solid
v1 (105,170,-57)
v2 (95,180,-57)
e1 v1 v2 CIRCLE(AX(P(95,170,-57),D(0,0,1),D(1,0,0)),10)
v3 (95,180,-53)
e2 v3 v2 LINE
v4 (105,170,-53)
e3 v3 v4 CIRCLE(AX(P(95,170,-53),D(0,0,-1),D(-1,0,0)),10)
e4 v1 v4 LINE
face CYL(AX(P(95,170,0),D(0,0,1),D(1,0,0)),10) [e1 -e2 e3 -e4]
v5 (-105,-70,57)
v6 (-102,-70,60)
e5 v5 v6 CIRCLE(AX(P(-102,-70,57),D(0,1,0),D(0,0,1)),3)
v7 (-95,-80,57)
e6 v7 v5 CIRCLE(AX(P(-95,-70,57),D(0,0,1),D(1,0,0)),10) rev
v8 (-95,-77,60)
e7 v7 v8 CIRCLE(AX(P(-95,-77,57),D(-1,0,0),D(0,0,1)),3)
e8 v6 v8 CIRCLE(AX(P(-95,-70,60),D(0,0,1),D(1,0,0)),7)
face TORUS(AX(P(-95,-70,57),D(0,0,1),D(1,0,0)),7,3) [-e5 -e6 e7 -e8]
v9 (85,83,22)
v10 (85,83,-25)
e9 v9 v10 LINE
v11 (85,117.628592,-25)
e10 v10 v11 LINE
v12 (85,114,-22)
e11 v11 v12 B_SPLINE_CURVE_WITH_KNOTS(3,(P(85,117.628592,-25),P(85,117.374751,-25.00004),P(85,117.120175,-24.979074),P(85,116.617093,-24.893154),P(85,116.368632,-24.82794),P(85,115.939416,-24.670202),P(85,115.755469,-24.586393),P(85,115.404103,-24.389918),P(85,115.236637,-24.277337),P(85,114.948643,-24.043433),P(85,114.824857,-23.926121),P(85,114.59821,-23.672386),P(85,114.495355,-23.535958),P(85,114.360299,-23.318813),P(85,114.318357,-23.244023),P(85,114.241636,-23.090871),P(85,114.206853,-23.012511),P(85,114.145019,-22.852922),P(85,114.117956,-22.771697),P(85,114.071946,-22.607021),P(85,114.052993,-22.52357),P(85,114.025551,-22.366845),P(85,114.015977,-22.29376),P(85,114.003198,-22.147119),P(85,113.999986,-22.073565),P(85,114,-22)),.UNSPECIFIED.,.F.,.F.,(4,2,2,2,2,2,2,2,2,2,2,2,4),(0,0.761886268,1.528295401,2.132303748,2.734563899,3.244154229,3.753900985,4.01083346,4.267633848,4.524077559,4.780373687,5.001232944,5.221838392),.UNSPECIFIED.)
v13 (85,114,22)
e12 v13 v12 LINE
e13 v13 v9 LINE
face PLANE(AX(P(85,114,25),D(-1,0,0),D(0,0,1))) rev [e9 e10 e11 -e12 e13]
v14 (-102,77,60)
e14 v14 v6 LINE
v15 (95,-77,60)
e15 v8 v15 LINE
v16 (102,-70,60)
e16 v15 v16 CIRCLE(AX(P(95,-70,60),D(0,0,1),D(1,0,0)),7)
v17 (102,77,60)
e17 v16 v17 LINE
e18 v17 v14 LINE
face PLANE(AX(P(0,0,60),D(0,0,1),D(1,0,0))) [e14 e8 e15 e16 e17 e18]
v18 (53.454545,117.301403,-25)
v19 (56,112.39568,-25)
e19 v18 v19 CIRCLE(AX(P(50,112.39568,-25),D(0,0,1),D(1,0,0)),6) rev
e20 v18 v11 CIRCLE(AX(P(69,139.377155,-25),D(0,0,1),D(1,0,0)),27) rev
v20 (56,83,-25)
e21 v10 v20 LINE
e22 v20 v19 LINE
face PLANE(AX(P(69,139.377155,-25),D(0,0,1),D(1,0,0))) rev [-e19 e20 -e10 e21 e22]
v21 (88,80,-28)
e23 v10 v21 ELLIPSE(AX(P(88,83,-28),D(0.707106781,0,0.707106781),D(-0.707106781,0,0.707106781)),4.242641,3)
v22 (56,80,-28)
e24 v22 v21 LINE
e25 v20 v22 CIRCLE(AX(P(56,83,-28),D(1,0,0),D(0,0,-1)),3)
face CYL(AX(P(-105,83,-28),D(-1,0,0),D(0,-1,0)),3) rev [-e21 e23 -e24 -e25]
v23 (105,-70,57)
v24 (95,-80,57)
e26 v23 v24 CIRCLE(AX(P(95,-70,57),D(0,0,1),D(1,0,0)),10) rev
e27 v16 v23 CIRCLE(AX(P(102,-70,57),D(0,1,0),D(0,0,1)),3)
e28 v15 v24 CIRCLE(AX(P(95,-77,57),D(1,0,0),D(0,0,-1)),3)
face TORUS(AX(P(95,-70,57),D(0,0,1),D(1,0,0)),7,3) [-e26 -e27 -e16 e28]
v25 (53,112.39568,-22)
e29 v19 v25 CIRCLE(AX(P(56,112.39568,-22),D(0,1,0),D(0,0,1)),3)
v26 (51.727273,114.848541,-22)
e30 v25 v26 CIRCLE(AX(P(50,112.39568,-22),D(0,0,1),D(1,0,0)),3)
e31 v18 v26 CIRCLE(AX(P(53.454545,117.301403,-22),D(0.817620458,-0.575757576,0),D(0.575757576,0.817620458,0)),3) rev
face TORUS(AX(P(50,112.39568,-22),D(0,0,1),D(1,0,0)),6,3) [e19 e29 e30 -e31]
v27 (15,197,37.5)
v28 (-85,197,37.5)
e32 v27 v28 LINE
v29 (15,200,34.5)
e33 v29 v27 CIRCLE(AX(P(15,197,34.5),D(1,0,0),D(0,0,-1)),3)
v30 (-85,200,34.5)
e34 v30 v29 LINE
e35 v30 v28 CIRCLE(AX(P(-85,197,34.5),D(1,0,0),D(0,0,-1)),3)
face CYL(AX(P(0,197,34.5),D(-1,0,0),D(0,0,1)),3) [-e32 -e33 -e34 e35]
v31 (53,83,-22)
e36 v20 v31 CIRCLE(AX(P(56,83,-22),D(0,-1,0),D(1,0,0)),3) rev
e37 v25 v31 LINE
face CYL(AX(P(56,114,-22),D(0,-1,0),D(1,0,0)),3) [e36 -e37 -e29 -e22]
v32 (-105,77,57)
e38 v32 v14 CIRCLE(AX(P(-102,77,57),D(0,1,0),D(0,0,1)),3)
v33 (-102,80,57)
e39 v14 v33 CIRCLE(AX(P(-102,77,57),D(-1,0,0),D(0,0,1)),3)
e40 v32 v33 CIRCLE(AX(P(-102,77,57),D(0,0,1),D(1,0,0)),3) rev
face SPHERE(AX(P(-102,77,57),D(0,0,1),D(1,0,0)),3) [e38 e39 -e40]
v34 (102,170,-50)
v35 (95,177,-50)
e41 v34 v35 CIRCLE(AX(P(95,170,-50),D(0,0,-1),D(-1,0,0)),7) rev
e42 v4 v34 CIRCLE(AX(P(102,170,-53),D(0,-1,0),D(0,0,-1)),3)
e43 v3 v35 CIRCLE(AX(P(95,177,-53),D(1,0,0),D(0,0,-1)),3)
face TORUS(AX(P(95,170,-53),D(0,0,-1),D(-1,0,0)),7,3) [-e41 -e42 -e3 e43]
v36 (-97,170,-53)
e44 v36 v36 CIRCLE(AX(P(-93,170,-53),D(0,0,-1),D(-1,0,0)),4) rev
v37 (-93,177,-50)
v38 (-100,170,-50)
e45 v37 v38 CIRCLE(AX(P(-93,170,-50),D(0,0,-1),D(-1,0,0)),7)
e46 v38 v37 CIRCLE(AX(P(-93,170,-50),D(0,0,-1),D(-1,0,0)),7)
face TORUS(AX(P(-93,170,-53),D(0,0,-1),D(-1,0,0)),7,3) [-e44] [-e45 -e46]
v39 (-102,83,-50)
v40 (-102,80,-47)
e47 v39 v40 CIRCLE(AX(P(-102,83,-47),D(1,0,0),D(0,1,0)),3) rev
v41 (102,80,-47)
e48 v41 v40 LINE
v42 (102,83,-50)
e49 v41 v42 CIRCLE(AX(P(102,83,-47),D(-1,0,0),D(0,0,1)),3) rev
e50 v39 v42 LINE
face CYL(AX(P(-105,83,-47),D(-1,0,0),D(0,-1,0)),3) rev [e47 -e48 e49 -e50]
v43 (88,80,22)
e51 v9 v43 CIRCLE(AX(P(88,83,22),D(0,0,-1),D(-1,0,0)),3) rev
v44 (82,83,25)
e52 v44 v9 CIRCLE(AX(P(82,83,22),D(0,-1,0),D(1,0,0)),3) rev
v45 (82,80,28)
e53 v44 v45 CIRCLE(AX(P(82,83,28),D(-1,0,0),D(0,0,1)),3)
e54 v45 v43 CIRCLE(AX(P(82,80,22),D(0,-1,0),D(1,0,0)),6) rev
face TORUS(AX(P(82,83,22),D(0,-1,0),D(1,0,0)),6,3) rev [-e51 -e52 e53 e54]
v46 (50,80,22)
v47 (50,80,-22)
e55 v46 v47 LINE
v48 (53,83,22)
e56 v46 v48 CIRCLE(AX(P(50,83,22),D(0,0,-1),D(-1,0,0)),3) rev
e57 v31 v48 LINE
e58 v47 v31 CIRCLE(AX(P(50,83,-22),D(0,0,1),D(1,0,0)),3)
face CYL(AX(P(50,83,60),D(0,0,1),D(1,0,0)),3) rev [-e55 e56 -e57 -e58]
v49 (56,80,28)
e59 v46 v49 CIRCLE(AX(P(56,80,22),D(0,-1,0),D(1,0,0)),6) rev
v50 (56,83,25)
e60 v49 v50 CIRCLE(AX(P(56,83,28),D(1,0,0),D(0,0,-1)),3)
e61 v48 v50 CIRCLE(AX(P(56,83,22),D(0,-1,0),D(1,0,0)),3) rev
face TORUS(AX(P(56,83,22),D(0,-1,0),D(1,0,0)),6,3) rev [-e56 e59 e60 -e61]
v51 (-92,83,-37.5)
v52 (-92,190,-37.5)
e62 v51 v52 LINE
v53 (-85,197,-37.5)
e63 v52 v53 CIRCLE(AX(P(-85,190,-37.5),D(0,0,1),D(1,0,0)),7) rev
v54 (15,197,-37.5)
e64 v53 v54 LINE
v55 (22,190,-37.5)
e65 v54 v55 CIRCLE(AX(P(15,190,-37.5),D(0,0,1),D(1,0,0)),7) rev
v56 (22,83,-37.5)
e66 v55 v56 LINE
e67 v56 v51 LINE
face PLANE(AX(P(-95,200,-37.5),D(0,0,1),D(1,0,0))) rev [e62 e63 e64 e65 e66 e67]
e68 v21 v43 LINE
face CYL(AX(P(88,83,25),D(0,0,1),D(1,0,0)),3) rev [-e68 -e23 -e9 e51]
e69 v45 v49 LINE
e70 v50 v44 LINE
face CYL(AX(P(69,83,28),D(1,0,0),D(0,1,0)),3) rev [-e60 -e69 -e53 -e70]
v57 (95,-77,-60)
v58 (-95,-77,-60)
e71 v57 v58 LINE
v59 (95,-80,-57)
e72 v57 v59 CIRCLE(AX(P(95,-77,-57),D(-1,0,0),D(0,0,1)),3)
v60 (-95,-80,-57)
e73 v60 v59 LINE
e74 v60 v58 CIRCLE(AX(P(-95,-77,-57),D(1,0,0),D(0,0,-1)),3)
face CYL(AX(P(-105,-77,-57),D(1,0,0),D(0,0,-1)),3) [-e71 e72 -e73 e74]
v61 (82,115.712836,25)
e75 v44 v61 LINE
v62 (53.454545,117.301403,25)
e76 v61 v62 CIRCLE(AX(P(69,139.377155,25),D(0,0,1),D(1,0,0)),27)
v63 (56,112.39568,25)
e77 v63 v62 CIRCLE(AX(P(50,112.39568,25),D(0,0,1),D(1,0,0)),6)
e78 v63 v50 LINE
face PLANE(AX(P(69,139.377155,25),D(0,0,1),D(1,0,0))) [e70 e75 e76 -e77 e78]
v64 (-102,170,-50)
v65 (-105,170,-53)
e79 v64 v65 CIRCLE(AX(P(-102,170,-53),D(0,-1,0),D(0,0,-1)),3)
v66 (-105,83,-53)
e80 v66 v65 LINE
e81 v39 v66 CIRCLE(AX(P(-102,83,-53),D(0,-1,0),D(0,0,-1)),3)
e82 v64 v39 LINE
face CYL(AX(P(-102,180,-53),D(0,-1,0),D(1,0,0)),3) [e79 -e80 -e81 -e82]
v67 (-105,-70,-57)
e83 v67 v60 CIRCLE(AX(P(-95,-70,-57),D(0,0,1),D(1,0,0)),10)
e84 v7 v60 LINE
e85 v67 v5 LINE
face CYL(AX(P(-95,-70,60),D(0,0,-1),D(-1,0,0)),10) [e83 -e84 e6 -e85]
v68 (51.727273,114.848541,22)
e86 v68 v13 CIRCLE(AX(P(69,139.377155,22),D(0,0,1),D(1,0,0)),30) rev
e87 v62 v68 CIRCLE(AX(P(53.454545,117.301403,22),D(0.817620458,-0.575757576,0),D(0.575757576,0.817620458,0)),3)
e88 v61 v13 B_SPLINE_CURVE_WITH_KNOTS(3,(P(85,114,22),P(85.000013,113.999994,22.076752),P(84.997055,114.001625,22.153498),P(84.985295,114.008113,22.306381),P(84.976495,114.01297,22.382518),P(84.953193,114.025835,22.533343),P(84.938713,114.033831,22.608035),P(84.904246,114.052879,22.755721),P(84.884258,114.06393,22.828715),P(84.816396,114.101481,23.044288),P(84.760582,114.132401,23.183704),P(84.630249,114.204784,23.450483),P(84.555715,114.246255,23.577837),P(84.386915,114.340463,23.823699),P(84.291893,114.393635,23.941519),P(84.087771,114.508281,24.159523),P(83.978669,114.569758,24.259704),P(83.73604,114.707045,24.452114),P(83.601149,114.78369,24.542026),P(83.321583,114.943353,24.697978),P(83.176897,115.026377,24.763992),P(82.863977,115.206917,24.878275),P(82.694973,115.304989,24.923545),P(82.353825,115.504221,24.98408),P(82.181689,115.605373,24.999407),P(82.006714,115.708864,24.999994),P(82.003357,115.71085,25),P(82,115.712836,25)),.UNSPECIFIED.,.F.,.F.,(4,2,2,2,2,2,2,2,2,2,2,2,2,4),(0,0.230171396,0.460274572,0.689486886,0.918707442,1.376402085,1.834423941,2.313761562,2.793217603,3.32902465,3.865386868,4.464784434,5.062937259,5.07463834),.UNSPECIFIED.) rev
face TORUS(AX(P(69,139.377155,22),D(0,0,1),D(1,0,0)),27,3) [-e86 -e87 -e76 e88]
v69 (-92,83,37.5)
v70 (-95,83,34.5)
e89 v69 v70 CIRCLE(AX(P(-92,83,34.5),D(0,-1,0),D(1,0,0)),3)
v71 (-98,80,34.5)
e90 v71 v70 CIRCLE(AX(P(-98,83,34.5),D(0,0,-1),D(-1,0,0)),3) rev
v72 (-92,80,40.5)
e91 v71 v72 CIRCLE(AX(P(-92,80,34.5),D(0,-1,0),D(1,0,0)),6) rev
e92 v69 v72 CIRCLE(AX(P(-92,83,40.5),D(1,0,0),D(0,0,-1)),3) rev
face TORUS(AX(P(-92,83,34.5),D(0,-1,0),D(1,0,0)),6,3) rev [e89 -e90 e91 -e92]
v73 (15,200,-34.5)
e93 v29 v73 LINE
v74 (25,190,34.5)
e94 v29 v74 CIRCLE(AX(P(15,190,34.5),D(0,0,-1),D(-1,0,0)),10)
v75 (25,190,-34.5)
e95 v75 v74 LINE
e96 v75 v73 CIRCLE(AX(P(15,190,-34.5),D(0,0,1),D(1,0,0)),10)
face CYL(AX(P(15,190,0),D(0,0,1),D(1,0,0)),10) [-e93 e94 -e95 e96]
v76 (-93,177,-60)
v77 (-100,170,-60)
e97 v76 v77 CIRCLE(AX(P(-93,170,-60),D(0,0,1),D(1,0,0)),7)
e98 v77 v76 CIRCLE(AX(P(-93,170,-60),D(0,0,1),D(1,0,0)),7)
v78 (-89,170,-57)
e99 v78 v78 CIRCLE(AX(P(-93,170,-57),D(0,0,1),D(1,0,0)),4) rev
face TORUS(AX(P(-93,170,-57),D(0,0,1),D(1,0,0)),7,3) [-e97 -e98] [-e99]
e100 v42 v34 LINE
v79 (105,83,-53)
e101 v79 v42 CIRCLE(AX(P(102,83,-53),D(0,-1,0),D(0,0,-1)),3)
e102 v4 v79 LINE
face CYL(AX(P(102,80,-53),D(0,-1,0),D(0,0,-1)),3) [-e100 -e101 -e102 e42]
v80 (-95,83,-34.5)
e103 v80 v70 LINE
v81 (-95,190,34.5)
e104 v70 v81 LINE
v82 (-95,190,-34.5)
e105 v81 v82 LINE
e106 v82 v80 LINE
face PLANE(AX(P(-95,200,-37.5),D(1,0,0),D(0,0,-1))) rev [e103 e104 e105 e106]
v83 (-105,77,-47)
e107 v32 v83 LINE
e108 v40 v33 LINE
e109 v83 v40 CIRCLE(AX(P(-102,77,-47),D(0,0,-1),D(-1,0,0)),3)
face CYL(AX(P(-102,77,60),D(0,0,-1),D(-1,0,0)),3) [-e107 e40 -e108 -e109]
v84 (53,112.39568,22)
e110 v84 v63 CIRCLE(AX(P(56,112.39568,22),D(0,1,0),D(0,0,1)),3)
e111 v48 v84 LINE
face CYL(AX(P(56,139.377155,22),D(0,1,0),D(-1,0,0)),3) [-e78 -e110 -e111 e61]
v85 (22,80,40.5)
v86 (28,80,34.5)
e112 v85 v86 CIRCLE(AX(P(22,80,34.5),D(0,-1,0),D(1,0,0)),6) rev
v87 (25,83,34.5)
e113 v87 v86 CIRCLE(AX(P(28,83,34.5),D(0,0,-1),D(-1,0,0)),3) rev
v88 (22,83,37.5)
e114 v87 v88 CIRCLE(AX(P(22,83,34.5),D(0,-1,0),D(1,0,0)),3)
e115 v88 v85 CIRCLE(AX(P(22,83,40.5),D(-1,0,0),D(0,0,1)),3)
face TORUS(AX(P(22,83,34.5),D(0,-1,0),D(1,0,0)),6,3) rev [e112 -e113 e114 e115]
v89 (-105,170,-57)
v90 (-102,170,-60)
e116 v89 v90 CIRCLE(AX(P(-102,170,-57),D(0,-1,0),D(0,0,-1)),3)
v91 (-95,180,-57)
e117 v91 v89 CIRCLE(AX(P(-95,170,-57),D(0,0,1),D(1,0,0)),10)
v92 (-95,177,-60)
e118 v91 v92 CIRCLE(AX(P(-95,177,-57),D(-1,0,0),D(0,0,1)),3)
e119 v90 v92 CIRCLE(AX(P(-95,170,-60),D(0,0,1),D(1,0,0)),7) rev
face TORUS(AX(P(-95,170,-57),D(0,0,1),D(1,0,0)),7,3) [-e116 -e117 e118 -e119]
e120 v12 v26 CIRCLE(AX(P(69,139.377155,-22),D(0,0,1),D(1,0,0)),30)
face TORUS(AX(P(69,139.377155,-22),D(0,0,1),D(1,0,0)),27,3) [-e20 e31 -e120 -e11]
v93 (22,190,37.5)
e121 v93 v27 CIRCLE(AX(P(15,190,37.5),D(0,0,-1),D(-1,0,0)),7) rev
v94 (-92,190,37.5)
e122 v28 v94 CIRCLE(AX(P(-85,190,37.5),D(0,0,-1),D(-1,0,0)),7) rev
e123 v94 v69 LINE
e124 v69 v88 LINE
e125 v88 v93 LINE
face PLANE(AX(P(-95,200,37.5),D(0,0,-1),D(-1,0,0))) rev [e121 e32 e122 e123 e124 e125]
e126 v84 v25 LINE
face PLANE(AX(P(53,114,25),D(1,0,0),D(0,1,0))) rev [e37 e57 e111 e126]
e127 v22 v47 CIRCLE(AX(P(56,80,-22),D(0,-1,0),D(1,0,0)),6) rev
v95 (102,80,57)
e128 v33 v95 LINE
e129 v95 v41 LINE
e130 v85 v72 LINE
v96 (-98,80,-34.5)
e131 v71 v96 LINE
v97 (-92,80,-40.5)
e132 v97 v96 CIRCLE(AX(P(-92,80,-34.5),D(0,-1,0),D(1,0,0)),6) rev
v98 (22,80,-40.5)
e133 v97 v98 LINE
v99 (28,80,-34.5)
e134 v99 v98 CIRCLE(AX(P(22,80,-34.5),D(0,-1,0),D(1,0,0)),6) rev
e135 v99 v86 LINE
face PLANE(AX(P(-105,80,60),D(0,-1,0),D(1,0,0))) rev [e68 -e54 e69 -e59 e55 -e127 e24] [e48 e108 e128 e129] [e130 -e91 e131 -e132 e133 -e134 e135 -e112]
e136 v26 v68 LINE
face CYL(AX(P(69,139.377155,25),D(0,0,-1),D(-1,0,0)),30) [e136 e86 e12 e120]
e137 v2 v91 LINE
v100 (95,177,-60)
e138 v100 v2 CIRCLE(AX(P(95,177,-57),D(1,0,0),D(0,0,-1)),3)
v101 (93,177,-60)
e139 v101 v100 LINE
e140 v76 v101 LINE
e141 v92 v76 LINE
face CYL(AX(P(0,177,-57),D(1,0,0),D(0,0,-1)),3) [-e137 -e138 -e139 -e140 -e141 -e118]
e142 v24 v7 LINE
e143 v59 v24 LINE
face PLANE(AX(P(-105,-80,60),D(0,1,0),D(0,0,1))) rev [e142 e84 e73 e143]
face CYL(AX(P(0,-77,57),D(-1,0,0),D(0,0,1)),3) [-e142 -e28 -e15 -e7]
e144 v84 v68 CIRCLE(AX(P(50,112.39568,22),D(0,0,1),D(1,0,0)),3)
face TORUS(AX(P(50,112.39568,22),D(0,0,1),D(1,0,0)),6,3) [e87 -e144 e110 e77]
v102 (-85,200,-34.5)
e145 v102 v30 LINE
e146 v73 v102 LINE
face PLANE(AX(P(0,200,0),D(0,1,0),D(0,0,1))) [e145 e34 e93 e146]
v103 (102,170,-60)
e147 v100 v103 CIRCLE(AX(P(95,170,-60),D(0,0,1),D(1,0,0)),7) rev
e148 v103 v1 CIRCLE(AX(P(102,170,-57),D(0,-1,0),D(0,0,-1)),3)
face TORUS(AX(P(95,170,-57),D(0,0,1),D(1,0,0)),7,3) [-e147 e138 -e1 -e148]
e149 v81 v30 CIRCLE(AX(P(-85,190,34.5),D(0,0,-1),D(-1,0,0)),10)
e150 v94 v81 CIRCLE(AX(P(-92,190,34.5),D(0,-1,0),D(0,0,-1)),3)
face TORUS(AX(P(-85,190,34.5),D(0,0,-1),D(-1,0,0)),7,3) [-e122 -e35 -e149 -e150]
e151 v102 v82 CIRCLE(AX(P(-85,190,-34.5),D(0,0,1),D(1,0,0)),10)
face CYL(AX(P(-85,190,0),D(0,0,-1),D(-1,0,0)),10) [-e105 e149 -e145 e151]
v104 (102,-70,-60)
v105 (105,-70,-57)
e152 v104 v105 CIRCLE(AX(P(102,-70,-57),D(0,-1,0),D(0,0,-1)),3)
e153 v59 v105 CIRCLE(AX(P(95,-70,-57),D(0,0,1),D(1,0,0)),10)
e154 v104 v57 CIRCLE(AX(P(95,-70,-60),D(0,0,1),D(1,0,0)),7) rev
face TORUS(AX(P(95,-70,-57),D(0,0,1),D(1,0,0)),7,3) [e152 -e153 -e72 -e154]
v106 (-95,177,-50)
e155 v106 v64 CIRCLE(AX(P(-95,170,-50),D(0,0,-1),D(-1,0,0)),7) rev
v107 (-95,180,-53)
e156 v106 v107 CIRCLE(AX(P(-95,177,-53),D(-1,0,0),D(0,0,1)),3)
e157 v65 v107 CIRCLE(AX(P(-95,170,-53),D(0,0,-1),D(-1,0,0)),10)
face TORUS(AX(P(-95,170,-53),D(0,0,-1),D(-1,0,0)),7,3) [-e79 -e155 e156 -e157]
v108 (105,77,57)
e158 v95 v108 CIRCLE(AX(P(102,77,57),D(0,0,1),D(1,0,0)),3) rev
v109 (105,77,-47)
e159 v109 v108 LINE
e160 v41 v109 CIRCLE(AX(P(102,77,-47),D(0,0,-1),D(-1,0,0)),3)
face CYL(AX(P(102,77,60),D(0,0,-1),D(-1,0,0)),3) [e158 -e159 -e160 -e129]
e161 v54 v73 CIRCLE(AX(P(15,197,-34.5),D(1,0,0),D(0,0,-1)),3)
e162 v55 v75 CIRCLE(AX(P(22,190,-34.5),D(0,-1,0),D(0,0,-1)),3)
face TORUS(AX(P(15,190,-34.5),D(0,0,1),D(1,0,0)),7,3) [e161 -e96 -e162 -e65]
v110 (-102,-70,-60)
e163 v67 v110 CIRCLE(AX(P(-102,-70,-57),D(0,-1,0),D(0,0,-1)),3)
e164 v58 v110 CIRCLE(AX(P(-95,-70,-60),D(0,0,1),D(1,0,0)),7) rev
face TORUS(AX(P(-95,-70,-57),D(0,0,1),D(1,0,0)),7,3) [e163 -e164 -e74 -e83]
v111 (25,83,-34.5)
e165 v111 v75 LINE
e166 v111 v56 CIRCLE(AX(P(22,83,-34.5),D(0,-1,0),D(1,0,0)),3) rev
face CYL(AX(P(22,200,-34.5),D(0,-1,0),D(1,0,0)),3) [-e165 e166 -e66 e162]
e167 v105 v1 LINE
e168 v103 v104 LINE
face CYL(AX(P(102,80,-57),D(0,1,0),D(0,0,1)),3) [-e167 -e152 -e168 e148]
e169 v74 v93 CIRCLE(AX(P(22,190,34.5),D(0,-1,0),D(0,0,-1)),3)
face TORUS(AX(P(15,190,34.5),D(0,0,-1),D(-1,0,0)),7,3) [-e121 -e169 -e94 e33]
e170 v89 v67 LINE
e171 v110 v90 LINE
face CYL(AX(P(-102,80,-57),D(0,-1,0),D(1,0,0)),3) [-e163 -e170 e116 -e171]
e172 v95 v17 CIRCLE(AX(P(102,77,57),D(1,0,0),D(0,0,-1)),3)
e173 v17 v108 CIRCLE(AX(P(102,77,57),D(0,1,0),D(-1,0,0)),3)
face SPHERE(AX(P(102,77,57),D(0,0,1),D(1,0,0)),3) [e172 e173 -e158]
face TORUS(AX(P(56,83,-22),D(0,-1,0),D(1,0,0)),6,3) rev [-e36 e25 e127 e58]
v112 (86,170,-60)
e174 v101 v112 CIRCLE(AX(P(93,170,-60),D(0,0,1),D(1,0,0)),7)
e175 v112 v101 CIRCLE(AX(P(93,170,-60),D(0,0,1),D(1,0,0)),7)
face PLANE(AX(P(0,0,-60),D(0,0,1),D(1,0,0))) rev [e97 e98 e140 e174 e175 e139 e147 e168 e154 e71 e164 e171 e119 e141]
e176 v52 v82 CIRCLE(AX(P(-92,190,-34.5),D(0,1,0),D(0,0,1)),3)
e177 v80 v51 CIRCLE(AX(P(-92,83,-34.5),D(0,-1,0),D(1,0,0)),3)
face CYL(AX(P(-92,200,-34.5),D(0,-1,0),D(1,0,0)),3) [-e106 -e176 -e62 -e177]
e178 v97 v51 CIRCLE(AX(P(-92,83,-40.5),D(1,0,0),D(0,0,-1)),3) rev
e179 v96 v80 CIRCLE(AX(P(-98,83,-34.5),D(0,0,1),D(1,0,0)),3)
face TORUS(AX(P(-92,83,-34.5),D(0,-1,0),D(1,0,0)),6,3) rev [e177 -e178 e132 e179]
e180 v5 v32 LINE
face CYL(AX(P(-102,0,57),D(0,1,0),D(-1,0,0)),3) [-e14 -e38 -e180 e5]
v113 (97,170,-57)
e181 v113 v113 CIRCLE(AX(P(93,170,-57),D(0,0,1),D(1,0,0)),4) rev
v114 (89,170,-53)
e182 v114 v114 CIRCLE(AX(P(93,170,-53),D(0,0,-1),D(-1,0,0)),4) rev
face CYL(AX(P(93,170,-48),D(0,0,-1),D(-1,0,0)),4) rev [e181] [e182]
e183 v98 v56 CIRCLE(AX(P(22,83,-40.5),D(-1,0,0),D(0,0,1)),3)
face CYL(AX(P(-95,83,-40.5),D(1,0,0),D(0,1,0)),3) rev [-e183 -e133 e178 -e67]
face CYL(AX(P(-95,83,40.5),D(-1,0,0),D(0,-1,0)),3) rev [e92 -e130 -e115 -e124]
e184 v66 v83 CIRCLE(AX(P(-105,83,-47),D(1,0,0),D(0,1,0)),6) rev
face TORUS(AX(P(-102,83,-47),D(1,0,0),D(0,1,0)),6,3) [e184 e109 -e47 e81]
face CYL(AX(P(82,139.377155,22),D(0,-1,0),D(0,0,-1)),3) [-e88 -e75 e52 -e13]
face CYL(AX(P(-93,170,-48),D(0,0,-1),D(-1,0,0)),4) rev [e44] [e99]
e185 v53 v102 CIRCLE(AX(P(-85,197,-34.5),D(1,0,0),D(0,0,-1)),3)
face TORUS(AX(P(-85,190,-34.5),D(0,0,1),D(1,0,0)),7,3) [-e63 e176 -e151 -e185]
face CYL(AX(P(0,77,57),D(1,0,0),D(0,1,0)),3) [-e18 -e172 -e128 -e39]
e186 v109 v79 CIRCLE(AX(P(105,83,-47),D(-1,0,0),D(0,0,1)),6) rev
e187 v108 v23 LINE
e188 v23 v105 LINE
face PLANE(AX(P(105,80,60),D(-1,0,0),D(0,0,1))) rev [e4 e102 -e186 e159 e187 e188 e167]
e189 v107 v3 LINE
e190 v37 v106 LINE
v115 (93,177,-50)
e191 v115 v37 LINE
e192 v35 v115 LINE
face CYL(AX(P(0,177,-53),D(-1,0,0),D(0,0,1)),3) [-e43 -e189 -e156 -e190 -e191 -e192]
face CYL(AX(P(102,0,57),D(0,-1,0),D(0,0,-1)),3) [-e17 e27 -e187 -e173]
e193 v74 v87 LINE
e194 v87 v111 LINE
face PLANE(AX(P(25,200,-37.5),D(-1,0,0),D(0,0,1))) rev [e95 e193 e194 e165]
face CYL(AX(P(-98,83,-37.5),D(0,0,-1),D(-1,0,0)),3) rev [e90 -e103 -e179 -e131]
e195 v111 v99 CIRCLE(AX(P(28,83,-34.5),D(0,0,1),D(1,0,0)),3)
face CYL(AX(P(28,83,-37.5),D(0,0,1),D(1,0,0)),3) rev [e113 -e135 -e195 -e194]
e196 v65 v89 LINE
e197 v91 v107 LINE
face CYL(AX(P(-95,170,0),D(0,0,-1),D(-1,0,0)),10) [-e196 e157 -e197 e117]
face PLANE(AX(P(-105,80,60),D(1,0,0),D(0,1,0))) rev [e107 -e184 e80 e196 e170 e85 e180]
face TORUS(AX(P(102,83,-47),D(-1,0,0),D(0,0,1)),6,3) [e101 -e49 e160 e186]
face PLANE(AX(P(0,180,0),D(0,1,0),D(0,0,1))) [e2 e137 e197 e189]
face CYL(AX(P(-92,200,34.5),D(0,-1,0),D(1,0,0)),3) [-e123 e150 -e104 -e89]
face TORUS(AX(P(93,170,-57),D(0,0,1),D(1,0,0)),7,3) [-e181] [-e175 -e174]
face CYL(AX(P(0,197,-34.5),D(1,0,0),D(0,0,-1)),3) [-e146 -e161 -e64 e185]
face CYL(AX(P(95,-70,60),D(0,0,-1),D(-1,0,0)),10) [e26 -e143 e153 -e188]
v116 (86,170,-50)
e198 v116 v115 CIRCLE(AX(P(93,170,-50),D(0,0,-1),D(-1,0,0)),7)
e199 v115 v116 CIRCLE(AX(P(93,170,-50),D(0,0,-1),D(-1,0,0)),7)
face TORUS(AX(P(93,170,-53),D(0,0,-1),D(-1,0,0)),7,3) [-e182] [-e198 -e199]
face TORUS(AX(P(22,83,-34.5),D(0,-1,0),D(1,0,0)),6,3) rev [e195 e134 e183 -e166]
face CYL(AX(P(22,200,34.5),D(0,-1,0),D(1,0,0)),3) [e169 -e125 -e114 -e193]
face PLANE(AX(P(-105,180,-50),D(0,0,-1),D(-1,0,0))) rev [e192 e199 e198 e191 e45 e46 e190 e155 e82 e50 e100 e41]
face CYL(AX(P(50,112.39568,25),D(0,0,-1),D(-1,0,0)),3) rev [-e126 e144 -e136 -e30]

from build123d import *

# Parameters (mm, degrees)
SKETCH_1_W          = 210
SKETCH_1_H          = 160
EXTRUDE_1_DEPTH     = 60
SKETCH_2_W          = 120
SKETCH_2_H          = 75
EXTRUDE_2_DEPTH     = 120
EXTRUDE_3_DEPTH     = 25
SKETCH_4_W          = 210
SKETCH_4_H          = 10
EXTRUDE_4_DEPTH     = 100
SKETCH_5_R          = 4
CUT_EXTRUDE_1_DEPTH = 12
FILLET_1_R          = 10
FILLET_4_R          = 3


with BuildPart() as part:
    # 草图1 → 凸台-拉伸1 (new, symmetric)
    with BuildSketch(Plane.XY):
        Rectangle(SKETCH_1_W, SKETCH_1_H)
    extrude(amount=EXTRUDE_1_DEPTH, both=True)

    # 草图2 → 凸台-拉伸2 (add)
    with BuildSketch(Plane(origin=(0, 80, 0), x_dir=(1, 0, 0), z_dir=(0, 1, 0))):
        with Locations((-35, 0)):
            Rectangle(SKETCH_2_W, SKETCH_2_H)
    extrude(amount=EXTRUDE_2_DEPTH)

    # 草图3 → 凸台-拉伸3 (add, symmetric)
    with BuildSketch(Plane.XY):
        with BuildLine():
            Line((53, 114), (53, 80))
            Line((53, 80), (85, 80))
            Line((85, 80), (85, 114))
            ThreePointArc((85, 114), (69, 169.377155081), (53, 114))
        make_face()
    extrude(amount=EXTRUDE_3_DEPTH, both=True)

    # 草图4 → 凸台-拉伸4 (add)
    with BuildSketch(Plane(origin=(0, 80, 0), x_dir=(1, 0, 0), z_dir=(0, 1, 0))):
        with Locations((0, 55)):
            Rectangle(SKETCH_4_W, SKETCH_4_H)
    extrude(amount=EXTRUDE_4_DEPTH)

    # 草图5 → 切除-拉伸1 (cut)
    with BuildSketch(Plane(origin=(0, 0, -60), x_dir=(-1, 0, 0), z_dir=(0, 0, -1))):
        with Locations((-93, 170)):
            Circle(SKETCH_5_R)
        with Locations((93, 170)):
            Circle(SKETCH_5_R)
    extrude(amount=-CUT_EXTRUDE_1_DEPTH, mode=Mode.SUBTRACT)

    # 圆角1
    fillet_1_edges = [part.edges().sort_by_distance(p)[0] for p in [
        (25, 200, 0),
        (-95, 200, 0),
        (-105, 180, -55),
        (105, 180, -55),
        (105, -80, 0),
        (-105, -80, 0),
    ]]
    fillet(fillet_1_edges, radius=FILLET_1_R)

    # 圆角4
    fillet_4_edges = [part.edges().sort_by_distance(p)[0] for p in [
        (-105, 5, 60),
        (25, 80, 0),
        (-35, 80, -37.5),
        (-95, 80, 0),
        (-35, 80, 37.5),
        (69, 169.377155081, -25),
        (53, 97, -25),
        (53, 114, 0),
        (69, 80, -25),
        (53, 80, 0),
        (85, 80, 0),
        (69, 169.377155081, 25),
        (53, 97, 25),
        (69, 80, 25),
        (85, 97, 25),
        (0, 80, -50),
        (97, 170, -50),
        (97, 170, -60),
        (-89, 170, -50),
        (-89, 170, -60),
        (105, 50, -60),
        (105, 125, -50),
        (105, 5, 60),
        (0, -80, -60),
        (-105, 50, -60),
        (0, 180, -60),
        (102.071067812, 177.071067812, -60),
        (-102.071067812, 177.071067812, -60),
        (-102.071067812, -77.071067812, -60),
        (102.071067812, -77.071067812, -60),
        (0, -80, 60),
        (0, 80, 60),
        (-102.071067812, -77.071067812, 60),
        (102.071067812, -77.071067812, 60),
        (-105, 125, -50),
        (-35, 200, -37.5),
        (-35, 200, 37.5),
        (25, 135, 37.5),
        (-95, 135, 37.5),
        (22.071067812, 197.071067812, 37.5),
        (-105, 80, 5),
        (-92.071067812, 197.071067812, 37.5),
        (-95, 135, -37.5),
        (105, 80, 5),
        (25, 135, -37.5),
        (22.071067812, 197.071067812, -37.5),
        (-92.071067812, 197.071067812, -37.5),
        (0, 180, -50),
        (102.071067812, 177.071067812, -50),
        (-102.071067812, 177.071067812, -50),
    ]]
    fillet(fillet_4_edges, radius=FILLET_4_R - 0.0001)  # a hair under: the kernel refuses the full size


solid = part.part
